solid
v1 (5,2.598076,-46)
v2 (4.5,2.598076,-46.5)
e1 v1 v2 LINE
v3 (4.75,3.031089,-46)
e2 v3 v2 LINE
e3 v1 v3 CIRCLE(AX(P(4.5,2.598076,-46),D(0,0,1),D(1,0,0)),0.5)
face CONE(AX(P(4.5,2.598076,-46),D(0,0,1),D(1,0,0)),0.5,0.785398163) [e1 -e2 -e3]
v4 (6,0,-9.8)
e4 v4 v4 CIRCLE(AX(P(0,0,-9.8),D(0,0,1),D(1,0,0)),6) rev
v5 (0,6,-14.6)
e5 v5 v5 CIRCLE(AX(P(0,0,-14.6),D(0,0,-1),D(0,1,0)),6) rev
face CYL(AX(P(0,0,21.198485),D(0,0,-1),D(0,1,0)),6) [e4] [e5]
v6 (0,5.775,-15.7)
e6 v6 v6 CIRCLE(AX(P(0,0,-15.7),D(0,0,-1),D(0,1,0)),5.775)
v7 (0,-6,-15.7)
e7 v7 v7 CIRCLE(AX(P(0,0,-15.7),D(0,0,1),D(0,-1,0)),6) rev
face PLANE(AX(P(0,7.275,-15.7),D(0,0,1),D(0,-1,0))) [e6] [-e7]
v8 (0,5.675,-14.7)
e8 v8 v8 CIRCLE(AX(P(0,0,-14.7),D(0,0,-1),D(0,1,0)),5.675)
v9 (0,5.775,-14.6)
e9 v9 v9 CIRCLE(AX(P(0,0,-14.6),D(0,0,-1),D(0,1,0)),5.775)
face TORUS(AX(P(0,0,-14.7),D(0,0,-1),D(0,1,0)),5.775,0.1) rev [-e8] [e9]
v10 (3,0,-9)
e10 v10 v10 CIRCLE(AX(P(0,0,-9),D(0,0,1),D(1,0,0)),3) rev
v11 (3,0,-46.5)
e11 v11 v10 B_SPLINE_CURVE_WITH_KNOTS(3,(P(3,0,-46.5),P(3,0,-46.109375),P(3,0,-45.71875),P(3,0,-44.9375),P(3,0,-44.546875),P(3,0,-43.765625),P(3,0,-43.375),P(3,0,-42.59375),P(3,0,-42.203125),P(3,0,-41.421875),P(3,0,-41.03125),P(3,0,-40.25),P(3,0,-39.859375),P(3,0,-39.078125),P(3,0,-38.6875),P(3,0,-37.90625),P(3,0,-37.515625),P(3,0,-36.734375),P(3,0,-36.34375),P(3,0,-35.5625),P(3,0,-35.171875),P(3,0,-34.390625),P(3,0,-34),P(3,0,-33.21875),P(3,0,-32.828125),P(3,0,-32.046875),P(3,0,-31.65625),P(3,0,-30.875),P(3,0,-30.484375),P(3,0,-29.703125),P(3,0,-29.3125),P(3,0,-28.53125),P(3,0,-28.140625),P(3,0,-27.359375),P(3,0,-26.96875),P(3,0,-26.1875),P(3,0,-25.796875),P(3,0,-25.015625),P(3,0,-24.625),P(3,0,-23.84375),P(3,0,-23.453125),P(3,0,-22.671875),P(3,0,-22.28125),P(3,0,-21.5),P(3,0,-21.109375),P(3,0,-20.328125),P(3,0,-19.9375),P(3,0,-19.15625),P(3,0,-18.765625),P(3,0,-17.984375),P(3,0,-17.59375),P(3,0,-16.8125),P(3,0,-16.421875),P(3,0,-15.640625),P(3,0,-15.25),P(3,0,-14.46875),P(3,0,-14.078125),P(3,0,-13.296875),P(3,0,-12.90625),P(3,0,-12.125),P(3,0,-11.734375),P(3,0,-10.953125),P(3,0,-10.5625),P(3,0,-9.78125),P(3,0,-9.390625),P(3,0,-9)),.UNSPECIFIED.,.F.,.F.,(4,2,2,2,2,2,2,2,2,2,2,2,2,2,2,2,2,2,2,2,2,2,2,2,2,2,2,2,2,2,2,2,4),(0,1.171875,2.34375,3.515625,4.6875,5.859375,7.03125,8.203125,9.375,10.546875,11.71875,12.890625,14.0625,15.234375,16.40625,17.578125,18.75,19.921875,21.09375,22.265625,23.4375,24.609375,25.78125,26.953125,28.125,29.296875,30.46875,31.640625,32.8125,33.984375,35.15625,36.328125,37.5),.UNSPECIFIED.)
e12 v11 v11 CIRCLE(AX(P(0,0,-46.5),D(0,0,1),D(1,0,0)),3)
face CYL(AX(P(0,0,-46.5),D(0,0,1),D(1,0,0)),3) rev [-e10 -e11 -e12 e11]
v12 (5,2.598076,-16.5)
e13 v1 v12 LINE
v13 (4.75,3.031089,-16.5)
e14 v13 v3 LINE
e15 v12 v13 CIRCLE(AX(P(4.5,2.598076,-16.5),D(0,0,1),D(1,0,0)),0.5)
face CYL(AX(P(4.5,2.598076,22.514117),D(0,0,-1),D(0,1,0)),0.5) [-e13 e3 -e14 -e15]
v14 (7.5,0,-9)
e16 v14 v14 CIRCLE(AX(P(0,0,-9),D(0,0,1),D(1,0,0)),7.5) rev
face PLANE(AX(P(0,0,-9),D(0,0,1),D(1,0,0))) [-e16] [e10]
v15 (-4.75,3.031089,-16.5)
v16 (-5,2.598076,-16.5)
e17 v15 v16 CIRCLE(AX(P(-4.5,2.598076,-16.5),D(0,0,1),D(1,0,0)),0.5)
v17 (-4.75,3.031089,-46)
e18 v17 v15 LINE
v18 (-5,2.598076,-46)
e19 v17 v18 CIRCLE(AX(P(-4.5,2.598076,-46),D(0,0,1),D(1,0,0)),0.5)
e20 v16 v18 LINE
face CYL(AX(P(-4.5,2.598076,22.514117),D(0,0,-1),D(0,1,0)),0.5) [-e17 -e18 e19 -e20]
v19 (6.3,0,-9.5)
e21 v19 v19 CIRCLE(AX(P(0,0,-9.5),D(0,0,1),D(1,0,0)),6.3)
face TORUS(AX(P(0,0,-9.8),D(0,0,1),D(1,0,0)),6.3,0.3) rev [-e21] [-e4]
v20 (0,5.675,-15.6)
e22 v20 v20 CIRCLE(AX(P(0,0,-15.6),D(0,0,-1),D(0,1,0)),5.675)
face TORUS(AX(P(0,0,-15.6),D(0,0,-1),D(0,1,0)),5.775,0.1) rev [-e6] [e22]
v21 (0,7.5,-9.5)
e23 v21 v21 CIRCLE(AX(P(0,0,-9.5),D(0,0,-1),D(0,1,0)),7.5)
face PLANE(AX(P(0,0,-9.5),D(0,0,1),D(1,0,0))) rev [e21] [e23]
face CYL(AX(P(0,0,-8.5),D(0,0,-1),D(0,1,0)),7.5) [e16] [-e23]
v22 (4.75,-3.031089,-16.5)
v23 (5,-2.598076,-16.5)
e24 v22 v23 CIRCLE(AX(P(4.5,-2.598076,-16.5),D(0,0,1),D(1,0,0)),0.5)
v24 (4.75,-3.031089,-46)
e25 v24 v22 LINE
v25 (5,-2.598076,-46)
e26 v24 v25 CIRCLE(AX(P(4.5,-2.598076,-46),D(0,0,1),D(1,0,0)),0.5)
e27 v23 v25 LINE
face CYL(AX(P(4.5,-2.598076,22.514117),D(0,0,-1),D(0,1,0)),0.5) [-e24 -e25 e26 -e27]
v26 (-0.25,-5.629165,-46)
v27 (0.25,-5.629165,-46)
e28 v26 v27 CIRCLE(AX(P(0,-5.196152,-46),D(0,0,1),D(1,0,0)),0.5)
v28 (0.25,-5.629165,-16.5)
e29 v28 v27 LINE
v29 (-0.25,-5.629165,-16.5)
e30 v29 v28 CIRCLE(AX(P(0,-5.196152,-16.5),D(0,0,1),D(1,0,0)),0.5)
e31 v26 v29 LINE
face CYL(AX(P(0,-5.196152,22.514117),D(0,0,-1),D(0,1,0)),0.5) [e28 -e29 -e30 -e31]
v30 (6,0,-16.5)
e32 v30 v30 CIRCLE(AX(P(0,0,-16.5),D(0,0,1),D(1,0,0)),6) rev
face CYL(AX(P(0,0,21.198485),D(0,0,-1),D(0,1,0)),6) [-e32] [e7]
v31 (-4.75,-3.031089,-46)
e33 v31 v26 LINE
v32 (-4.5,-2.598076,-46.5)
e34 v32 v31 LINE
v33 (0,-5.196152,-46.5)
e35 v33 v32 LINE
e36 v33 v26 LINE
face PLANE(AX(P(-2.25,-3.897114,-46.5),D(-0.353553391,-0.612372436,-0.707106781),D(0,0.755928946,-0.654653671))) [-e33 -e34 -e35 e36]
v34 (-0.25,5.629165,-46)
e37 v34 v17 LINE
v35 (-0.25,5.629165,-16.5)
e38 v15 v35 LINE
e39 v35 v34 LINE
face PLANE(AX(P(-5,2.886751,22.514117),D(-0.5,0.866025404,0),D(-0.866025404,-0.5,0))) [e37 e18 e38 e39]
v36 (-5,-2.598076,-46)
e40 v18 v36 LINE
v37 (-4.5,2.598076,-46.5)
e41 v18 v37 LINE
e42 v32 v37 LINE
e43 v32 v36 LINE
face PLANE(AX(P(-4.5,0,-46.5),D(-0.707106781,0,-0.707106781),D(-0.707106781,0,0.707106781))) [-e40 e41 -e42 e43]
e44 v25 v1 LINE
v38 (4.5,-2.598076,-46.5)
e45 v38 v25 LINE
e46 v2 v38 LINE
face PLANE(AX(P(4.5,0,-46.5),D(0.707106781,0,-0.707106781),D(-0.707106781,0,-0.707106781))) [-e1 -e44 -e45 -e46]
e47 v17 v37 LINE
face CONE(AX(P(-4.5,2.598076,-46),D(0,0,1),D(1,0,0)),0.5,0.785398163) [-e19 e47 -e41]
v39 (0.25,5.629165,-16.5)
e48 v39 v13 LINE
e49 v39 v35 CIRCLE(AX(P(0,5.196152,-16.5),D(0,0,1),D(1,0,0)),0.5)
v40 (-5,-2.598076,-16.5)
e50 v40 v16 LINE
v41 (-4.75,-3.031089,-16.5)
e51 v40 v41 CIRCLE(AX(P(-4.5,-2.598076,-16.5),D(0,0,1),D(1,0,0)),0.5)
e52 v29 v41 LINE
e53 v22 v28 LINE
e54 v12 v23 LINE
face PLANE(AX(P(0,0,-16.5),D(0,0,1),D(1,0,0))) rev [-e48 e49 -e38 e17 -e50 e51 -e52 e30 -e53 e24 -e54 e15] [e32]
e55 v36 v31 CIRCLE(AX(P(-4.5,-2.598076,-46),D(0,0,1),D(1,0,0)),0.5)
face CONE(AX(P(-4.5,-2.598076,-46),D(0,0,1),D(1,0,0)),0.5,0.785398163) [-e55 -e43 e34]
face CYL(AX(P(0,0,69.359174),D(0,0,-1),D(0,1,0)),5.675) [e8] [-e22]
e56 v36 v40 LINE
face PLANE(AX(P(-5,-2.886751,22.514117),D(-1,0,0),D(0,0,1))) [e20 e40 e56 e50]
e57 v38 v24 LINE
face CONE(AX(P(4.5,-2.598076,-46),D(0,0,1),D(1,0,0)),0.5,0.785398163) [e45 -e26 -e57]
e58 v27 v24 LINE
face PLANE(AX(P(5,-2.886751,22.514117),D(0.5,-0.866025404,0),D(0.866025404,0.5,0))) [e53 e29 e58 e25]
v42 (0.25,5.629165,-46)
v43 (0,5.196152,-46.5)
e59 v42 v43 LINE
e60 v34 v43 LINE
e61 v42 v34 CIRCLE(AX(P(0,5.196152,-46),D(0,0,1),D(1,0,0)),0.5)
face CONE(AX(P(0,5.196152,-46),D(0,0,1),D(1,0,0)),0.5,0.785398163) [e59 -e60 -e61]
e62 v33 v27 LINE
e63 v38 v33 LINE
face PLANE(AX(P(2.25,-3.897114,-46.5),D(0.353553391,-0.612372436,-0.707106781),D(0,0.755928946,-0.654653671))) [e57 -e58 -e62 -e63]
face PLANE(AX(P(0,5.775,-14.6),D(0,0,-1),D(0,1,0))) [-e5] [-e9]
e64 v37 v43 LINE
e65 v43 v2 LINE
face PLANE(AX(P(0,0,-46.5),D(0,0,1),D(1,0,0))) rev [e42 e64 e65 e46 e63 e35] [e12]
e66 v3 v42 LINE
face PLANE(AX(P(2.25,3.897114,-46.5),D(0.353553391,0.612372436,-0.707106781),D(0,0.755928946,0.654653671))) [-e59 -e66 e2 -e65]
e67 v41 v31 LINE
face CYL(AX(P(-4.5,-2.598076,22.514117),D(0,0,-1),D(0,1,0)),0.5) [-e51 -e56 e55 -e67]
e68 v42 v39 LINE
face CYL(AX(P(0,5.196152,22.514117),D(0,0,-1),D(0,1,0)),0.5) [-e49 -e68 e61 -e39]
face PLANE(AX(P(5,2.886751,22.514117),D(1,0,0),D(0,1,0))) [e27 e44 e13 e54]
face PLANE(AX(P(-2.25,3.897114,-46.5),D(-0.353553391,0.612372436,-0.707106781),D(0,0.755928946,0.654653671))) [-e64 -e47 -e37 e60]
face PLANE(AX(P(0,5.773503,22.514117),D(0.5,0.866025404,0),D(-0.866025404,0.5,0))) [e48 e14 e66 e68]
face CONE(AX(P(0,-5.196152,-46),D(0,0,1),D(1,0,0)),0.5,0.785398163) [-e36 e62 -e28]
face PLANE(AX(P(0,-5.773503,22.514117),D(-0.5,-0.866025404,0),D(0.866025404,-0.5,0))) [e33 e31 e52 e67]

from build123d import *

# Parameters (mm, degrees)
SKETCH1_R             = 10.5
SKETCH1_R_2           = 3
EXTRUDE1_DEPTH        = 46.5
SKETCH1_3_R           = 3
CUT_EXTRUDE1_DEPTH    = 49.813420286
CUT_EXTRUDE4_DEPTH    = 8.5
CUT_EXTRUDE6_START    = -37
SKETCH6_R             = 10.5
SKETCH6_R_2           = 6
CUT_EXTRUDE6_DEPTH    = 37
CUT_EXTRUDE7_START    = -1
SKETCH7_R             = 10.5
SKETCH7_R_2           = 7.5
CUT_EXTRUDE7_DEPTH    = 1
M4X0_7_TAPPED_HOLE1_D = 3
SKETCH8_OUTSIDE_W     = 33.82
SKETCH8_OUTSIDE_H     = 30.82
CUT_EXTRUDE8_DEPTH    = 30
FILLET1_R             = 0.5
CHAMFER1_SIZE         = 0.5
FILLET2_R             = 0.3
CHAMFER2_SIZE         = 1
SKETCH13_R            = 14.541098745
CUT_EXTRUDE9_DEPTH    = 9


with BuildPart() as part:
    # Sketch1 → Extrude1 (new body)
    # profile 1 of 2: a face of its own
    with BuildSketch(Plane.XY):
        Circle(SKETCH1_R)
        Circle(SKETCH1_R_2, mode=Mode.SUBTRACT)
    # profile 2 of 2: a face of its own
    with BuildSketch(Plane.XY):
        Circle(SKETCH1_R_2)
    extrude(amount=-EXTRUDE1_DEPTH)

    # Sketch1<3> → Cut-Extrude1 (cut, through all)
    with BuildSketch(Plane.XY):
        Circle(SKETCH1_3_R)
    extrude(amount=-CUT_EXTRUDE1_DEPTH, mode=Mode.SUBTRACT)

    # Sketch4 → Cut-Extrude4 (cut)
    with BuildSketch(Plane.XY):
        with BuildLine():
            Line((-10.24499878, 2.3), (10.24499878, 2.3))
            ThreePointArc((10.24499878, 2.3), (0, 10.5), (-10.24499878, 2.3))
        make_face()
    extrude(amount=-CUT_EXTRUDE4_DEPTH, mode=Mode.SUBTRACT)

    # Sketch6 → Cut-Extrude6 (cut)
    with BuildSketch(Plane(origin=(0, 0, -46.5), x_dir=(1, 0, 0), z_dir=(0, 0, -1)).offset(CUT_EXTRUDE6_START)):
        Circle(SKETCH6_R)
        with Locations(Location((0, 0, 0), (0, 0, 270))):
            Circle(SKETCH6_R_2, mode=Mode.SUBTRACT)
    extrude(amount=CUT_EXTRUDE6_DEPTH, mode=Mode.SUBTRACT)

    # Sketch7 → Cut-Extrude7 (cut)
    with BuildSketch(Plane(origin=(0, 0, -9.5), x_dir=(1, 0, 0), z_dir=(0, 0, -1)).offset(CUT_EXTRUDE7_START)):
        Circle(SKETCH7_R)
        with Locations(Location((0, 0, 0), (0, 0, 270))):
            Circle(SKETCH7_R_2, mode=Mode.SUBTRACT)
    extrude(amount=CUT_EXTRUDE7_DEPTH, mode=Mode.SUBTRACT)

    # M4x0.7 Tapped Hole1 (through all)
    with Locations(Plane(origin=(6.25, 2.3, -4.25), x_dir=(0, 0, 1), z_dir=(0, 1, 0))):
        with Locations((0, 0), (0, -12.5)):
            Hole(M4X0_7_TAPPED_HOLE1_D / 2)

    # Sketch8 outside → Cut-Extrude8 (cut)
    with BuildSketch(Plane(origin=(0, 0, -46.5), x_dir=(1, 0, 0), z_dir=(0, 0, -1))):
        with Locations((0, 1.5)):
            Rectangle(SKETCH8_OUTSIDE_W, SKETCH8_OUTSIDE_H)
        Polygon((0, 5.773502692), (-5, 2.886751346), (-5, -2.886751346), (0, -5.773502692), (5, -2.886751346), (5, 2.886751346), align=None, mode=Mode.SUBTRACT)
    extrude(amount=-CUT_EXTRUDE8_DEPTH, mode=Mode.SUBTRACT)

    # Fillet1
    fillet1_edges = [part.edges().sort_by_distance(p)[0] for p in [
        (5, -2.886751346, -31.5),
        (5, 2.886751346, -31.5),
        (0, 5.773502692, -31.5),
        (-5, 2.886751346, -31.5),
        (-5, -2.886751346, -31.5),
        (0, -5.773502692, -31.5),
    ]]
    fillet(fillet1_edges, radius=FILLET1_R)

    # Chamfer1
    chamfer1_edges = [part.edges().sort_by_distance(p)[0] for p in [
        (-2.5, -4.330127019, -46.5),
        (2.5, -4.330127019, -46.5),
        (-5, 0, -46.5),
        (-2.5, 4.330127019, -46.5),
        (2.5, 4.330127019, -46.5),
        (5, 0, -46.5),
        (0, -5.696152423, -46.5),
        (4.933012702, -2.848076211, -46.5),
        (4.933012702, 2.848076211, -46.5),
        (0, 5.696152423, -46.5),
        (-4.933012702, 2.848076211, -46.5),
        (-4.933012702, -2.848076211, -46.5),
    ]]
    chamfer(chamfer1_edges, length=CHAMFER1_SIZE - 0.0001)  # a hair under: the kernel refuses the full size

    # Sketch12 → Groove for ANSI B27.7 - 3AM1-12, Basic External Retaining Ring1 (revolve, cut)
    with BuildSketch(Plane(origin=(0, 0, 19.370057685), x_dir=(0, 1, 0), z_dir=(-1, 0, 0))):
        with BuildLine():
            Line((5.775, 33.970057685), (7.275, 33.970057685))
            Line((7.275, 33.970057685), (7.275, 35.070057685))
            Line((7.275, 35.070057685), (5.775, 35.070057685))
            ThreePointArc((5.775, 35.070057685), (5.704289322, 35.040768363), (5.675, 34.970057685))
            Line((5.675, 34.970057685), (5.675, 34.070057685))
            ThreePointArc((5.675, 34.070057685), (5.704289322, 33.999347007), (5.775, 33.970057685))
        make_face()
    revolve(axis=Axis((0, 0, 69.359173663), (0, 0, -1)), mode=Mode.SUBTRACT)

    # Fillet2
    fillet2_edges = [part.edges().sort_by_distance(p)[0] for p in [
        (0, -6, -9.5),
        (0, -7.5, -8.5),
    ]]
    fillet(fillet2_edges, radius=FILLET2_R)

    # Chamfer2
    chamfer2_edges = [part.edges().sort_by_distance(p)[0] for p in [
        (0, -10.5, 0),
        (0, -10.5, -8.5),
    ]]
    chamfer(chamfer2_edges, length=CHAMFER2_SIZE)

    # Sketch13 → Cut-Extrude9 (cut)
    with BuildSketch(Plane.XY):
        Circle(SKETCH13_R)
    extrude(amount=-CUT_EXTRUDE9_DEPTH, mode=Mode.SUBTRACT)


solid = part.part
